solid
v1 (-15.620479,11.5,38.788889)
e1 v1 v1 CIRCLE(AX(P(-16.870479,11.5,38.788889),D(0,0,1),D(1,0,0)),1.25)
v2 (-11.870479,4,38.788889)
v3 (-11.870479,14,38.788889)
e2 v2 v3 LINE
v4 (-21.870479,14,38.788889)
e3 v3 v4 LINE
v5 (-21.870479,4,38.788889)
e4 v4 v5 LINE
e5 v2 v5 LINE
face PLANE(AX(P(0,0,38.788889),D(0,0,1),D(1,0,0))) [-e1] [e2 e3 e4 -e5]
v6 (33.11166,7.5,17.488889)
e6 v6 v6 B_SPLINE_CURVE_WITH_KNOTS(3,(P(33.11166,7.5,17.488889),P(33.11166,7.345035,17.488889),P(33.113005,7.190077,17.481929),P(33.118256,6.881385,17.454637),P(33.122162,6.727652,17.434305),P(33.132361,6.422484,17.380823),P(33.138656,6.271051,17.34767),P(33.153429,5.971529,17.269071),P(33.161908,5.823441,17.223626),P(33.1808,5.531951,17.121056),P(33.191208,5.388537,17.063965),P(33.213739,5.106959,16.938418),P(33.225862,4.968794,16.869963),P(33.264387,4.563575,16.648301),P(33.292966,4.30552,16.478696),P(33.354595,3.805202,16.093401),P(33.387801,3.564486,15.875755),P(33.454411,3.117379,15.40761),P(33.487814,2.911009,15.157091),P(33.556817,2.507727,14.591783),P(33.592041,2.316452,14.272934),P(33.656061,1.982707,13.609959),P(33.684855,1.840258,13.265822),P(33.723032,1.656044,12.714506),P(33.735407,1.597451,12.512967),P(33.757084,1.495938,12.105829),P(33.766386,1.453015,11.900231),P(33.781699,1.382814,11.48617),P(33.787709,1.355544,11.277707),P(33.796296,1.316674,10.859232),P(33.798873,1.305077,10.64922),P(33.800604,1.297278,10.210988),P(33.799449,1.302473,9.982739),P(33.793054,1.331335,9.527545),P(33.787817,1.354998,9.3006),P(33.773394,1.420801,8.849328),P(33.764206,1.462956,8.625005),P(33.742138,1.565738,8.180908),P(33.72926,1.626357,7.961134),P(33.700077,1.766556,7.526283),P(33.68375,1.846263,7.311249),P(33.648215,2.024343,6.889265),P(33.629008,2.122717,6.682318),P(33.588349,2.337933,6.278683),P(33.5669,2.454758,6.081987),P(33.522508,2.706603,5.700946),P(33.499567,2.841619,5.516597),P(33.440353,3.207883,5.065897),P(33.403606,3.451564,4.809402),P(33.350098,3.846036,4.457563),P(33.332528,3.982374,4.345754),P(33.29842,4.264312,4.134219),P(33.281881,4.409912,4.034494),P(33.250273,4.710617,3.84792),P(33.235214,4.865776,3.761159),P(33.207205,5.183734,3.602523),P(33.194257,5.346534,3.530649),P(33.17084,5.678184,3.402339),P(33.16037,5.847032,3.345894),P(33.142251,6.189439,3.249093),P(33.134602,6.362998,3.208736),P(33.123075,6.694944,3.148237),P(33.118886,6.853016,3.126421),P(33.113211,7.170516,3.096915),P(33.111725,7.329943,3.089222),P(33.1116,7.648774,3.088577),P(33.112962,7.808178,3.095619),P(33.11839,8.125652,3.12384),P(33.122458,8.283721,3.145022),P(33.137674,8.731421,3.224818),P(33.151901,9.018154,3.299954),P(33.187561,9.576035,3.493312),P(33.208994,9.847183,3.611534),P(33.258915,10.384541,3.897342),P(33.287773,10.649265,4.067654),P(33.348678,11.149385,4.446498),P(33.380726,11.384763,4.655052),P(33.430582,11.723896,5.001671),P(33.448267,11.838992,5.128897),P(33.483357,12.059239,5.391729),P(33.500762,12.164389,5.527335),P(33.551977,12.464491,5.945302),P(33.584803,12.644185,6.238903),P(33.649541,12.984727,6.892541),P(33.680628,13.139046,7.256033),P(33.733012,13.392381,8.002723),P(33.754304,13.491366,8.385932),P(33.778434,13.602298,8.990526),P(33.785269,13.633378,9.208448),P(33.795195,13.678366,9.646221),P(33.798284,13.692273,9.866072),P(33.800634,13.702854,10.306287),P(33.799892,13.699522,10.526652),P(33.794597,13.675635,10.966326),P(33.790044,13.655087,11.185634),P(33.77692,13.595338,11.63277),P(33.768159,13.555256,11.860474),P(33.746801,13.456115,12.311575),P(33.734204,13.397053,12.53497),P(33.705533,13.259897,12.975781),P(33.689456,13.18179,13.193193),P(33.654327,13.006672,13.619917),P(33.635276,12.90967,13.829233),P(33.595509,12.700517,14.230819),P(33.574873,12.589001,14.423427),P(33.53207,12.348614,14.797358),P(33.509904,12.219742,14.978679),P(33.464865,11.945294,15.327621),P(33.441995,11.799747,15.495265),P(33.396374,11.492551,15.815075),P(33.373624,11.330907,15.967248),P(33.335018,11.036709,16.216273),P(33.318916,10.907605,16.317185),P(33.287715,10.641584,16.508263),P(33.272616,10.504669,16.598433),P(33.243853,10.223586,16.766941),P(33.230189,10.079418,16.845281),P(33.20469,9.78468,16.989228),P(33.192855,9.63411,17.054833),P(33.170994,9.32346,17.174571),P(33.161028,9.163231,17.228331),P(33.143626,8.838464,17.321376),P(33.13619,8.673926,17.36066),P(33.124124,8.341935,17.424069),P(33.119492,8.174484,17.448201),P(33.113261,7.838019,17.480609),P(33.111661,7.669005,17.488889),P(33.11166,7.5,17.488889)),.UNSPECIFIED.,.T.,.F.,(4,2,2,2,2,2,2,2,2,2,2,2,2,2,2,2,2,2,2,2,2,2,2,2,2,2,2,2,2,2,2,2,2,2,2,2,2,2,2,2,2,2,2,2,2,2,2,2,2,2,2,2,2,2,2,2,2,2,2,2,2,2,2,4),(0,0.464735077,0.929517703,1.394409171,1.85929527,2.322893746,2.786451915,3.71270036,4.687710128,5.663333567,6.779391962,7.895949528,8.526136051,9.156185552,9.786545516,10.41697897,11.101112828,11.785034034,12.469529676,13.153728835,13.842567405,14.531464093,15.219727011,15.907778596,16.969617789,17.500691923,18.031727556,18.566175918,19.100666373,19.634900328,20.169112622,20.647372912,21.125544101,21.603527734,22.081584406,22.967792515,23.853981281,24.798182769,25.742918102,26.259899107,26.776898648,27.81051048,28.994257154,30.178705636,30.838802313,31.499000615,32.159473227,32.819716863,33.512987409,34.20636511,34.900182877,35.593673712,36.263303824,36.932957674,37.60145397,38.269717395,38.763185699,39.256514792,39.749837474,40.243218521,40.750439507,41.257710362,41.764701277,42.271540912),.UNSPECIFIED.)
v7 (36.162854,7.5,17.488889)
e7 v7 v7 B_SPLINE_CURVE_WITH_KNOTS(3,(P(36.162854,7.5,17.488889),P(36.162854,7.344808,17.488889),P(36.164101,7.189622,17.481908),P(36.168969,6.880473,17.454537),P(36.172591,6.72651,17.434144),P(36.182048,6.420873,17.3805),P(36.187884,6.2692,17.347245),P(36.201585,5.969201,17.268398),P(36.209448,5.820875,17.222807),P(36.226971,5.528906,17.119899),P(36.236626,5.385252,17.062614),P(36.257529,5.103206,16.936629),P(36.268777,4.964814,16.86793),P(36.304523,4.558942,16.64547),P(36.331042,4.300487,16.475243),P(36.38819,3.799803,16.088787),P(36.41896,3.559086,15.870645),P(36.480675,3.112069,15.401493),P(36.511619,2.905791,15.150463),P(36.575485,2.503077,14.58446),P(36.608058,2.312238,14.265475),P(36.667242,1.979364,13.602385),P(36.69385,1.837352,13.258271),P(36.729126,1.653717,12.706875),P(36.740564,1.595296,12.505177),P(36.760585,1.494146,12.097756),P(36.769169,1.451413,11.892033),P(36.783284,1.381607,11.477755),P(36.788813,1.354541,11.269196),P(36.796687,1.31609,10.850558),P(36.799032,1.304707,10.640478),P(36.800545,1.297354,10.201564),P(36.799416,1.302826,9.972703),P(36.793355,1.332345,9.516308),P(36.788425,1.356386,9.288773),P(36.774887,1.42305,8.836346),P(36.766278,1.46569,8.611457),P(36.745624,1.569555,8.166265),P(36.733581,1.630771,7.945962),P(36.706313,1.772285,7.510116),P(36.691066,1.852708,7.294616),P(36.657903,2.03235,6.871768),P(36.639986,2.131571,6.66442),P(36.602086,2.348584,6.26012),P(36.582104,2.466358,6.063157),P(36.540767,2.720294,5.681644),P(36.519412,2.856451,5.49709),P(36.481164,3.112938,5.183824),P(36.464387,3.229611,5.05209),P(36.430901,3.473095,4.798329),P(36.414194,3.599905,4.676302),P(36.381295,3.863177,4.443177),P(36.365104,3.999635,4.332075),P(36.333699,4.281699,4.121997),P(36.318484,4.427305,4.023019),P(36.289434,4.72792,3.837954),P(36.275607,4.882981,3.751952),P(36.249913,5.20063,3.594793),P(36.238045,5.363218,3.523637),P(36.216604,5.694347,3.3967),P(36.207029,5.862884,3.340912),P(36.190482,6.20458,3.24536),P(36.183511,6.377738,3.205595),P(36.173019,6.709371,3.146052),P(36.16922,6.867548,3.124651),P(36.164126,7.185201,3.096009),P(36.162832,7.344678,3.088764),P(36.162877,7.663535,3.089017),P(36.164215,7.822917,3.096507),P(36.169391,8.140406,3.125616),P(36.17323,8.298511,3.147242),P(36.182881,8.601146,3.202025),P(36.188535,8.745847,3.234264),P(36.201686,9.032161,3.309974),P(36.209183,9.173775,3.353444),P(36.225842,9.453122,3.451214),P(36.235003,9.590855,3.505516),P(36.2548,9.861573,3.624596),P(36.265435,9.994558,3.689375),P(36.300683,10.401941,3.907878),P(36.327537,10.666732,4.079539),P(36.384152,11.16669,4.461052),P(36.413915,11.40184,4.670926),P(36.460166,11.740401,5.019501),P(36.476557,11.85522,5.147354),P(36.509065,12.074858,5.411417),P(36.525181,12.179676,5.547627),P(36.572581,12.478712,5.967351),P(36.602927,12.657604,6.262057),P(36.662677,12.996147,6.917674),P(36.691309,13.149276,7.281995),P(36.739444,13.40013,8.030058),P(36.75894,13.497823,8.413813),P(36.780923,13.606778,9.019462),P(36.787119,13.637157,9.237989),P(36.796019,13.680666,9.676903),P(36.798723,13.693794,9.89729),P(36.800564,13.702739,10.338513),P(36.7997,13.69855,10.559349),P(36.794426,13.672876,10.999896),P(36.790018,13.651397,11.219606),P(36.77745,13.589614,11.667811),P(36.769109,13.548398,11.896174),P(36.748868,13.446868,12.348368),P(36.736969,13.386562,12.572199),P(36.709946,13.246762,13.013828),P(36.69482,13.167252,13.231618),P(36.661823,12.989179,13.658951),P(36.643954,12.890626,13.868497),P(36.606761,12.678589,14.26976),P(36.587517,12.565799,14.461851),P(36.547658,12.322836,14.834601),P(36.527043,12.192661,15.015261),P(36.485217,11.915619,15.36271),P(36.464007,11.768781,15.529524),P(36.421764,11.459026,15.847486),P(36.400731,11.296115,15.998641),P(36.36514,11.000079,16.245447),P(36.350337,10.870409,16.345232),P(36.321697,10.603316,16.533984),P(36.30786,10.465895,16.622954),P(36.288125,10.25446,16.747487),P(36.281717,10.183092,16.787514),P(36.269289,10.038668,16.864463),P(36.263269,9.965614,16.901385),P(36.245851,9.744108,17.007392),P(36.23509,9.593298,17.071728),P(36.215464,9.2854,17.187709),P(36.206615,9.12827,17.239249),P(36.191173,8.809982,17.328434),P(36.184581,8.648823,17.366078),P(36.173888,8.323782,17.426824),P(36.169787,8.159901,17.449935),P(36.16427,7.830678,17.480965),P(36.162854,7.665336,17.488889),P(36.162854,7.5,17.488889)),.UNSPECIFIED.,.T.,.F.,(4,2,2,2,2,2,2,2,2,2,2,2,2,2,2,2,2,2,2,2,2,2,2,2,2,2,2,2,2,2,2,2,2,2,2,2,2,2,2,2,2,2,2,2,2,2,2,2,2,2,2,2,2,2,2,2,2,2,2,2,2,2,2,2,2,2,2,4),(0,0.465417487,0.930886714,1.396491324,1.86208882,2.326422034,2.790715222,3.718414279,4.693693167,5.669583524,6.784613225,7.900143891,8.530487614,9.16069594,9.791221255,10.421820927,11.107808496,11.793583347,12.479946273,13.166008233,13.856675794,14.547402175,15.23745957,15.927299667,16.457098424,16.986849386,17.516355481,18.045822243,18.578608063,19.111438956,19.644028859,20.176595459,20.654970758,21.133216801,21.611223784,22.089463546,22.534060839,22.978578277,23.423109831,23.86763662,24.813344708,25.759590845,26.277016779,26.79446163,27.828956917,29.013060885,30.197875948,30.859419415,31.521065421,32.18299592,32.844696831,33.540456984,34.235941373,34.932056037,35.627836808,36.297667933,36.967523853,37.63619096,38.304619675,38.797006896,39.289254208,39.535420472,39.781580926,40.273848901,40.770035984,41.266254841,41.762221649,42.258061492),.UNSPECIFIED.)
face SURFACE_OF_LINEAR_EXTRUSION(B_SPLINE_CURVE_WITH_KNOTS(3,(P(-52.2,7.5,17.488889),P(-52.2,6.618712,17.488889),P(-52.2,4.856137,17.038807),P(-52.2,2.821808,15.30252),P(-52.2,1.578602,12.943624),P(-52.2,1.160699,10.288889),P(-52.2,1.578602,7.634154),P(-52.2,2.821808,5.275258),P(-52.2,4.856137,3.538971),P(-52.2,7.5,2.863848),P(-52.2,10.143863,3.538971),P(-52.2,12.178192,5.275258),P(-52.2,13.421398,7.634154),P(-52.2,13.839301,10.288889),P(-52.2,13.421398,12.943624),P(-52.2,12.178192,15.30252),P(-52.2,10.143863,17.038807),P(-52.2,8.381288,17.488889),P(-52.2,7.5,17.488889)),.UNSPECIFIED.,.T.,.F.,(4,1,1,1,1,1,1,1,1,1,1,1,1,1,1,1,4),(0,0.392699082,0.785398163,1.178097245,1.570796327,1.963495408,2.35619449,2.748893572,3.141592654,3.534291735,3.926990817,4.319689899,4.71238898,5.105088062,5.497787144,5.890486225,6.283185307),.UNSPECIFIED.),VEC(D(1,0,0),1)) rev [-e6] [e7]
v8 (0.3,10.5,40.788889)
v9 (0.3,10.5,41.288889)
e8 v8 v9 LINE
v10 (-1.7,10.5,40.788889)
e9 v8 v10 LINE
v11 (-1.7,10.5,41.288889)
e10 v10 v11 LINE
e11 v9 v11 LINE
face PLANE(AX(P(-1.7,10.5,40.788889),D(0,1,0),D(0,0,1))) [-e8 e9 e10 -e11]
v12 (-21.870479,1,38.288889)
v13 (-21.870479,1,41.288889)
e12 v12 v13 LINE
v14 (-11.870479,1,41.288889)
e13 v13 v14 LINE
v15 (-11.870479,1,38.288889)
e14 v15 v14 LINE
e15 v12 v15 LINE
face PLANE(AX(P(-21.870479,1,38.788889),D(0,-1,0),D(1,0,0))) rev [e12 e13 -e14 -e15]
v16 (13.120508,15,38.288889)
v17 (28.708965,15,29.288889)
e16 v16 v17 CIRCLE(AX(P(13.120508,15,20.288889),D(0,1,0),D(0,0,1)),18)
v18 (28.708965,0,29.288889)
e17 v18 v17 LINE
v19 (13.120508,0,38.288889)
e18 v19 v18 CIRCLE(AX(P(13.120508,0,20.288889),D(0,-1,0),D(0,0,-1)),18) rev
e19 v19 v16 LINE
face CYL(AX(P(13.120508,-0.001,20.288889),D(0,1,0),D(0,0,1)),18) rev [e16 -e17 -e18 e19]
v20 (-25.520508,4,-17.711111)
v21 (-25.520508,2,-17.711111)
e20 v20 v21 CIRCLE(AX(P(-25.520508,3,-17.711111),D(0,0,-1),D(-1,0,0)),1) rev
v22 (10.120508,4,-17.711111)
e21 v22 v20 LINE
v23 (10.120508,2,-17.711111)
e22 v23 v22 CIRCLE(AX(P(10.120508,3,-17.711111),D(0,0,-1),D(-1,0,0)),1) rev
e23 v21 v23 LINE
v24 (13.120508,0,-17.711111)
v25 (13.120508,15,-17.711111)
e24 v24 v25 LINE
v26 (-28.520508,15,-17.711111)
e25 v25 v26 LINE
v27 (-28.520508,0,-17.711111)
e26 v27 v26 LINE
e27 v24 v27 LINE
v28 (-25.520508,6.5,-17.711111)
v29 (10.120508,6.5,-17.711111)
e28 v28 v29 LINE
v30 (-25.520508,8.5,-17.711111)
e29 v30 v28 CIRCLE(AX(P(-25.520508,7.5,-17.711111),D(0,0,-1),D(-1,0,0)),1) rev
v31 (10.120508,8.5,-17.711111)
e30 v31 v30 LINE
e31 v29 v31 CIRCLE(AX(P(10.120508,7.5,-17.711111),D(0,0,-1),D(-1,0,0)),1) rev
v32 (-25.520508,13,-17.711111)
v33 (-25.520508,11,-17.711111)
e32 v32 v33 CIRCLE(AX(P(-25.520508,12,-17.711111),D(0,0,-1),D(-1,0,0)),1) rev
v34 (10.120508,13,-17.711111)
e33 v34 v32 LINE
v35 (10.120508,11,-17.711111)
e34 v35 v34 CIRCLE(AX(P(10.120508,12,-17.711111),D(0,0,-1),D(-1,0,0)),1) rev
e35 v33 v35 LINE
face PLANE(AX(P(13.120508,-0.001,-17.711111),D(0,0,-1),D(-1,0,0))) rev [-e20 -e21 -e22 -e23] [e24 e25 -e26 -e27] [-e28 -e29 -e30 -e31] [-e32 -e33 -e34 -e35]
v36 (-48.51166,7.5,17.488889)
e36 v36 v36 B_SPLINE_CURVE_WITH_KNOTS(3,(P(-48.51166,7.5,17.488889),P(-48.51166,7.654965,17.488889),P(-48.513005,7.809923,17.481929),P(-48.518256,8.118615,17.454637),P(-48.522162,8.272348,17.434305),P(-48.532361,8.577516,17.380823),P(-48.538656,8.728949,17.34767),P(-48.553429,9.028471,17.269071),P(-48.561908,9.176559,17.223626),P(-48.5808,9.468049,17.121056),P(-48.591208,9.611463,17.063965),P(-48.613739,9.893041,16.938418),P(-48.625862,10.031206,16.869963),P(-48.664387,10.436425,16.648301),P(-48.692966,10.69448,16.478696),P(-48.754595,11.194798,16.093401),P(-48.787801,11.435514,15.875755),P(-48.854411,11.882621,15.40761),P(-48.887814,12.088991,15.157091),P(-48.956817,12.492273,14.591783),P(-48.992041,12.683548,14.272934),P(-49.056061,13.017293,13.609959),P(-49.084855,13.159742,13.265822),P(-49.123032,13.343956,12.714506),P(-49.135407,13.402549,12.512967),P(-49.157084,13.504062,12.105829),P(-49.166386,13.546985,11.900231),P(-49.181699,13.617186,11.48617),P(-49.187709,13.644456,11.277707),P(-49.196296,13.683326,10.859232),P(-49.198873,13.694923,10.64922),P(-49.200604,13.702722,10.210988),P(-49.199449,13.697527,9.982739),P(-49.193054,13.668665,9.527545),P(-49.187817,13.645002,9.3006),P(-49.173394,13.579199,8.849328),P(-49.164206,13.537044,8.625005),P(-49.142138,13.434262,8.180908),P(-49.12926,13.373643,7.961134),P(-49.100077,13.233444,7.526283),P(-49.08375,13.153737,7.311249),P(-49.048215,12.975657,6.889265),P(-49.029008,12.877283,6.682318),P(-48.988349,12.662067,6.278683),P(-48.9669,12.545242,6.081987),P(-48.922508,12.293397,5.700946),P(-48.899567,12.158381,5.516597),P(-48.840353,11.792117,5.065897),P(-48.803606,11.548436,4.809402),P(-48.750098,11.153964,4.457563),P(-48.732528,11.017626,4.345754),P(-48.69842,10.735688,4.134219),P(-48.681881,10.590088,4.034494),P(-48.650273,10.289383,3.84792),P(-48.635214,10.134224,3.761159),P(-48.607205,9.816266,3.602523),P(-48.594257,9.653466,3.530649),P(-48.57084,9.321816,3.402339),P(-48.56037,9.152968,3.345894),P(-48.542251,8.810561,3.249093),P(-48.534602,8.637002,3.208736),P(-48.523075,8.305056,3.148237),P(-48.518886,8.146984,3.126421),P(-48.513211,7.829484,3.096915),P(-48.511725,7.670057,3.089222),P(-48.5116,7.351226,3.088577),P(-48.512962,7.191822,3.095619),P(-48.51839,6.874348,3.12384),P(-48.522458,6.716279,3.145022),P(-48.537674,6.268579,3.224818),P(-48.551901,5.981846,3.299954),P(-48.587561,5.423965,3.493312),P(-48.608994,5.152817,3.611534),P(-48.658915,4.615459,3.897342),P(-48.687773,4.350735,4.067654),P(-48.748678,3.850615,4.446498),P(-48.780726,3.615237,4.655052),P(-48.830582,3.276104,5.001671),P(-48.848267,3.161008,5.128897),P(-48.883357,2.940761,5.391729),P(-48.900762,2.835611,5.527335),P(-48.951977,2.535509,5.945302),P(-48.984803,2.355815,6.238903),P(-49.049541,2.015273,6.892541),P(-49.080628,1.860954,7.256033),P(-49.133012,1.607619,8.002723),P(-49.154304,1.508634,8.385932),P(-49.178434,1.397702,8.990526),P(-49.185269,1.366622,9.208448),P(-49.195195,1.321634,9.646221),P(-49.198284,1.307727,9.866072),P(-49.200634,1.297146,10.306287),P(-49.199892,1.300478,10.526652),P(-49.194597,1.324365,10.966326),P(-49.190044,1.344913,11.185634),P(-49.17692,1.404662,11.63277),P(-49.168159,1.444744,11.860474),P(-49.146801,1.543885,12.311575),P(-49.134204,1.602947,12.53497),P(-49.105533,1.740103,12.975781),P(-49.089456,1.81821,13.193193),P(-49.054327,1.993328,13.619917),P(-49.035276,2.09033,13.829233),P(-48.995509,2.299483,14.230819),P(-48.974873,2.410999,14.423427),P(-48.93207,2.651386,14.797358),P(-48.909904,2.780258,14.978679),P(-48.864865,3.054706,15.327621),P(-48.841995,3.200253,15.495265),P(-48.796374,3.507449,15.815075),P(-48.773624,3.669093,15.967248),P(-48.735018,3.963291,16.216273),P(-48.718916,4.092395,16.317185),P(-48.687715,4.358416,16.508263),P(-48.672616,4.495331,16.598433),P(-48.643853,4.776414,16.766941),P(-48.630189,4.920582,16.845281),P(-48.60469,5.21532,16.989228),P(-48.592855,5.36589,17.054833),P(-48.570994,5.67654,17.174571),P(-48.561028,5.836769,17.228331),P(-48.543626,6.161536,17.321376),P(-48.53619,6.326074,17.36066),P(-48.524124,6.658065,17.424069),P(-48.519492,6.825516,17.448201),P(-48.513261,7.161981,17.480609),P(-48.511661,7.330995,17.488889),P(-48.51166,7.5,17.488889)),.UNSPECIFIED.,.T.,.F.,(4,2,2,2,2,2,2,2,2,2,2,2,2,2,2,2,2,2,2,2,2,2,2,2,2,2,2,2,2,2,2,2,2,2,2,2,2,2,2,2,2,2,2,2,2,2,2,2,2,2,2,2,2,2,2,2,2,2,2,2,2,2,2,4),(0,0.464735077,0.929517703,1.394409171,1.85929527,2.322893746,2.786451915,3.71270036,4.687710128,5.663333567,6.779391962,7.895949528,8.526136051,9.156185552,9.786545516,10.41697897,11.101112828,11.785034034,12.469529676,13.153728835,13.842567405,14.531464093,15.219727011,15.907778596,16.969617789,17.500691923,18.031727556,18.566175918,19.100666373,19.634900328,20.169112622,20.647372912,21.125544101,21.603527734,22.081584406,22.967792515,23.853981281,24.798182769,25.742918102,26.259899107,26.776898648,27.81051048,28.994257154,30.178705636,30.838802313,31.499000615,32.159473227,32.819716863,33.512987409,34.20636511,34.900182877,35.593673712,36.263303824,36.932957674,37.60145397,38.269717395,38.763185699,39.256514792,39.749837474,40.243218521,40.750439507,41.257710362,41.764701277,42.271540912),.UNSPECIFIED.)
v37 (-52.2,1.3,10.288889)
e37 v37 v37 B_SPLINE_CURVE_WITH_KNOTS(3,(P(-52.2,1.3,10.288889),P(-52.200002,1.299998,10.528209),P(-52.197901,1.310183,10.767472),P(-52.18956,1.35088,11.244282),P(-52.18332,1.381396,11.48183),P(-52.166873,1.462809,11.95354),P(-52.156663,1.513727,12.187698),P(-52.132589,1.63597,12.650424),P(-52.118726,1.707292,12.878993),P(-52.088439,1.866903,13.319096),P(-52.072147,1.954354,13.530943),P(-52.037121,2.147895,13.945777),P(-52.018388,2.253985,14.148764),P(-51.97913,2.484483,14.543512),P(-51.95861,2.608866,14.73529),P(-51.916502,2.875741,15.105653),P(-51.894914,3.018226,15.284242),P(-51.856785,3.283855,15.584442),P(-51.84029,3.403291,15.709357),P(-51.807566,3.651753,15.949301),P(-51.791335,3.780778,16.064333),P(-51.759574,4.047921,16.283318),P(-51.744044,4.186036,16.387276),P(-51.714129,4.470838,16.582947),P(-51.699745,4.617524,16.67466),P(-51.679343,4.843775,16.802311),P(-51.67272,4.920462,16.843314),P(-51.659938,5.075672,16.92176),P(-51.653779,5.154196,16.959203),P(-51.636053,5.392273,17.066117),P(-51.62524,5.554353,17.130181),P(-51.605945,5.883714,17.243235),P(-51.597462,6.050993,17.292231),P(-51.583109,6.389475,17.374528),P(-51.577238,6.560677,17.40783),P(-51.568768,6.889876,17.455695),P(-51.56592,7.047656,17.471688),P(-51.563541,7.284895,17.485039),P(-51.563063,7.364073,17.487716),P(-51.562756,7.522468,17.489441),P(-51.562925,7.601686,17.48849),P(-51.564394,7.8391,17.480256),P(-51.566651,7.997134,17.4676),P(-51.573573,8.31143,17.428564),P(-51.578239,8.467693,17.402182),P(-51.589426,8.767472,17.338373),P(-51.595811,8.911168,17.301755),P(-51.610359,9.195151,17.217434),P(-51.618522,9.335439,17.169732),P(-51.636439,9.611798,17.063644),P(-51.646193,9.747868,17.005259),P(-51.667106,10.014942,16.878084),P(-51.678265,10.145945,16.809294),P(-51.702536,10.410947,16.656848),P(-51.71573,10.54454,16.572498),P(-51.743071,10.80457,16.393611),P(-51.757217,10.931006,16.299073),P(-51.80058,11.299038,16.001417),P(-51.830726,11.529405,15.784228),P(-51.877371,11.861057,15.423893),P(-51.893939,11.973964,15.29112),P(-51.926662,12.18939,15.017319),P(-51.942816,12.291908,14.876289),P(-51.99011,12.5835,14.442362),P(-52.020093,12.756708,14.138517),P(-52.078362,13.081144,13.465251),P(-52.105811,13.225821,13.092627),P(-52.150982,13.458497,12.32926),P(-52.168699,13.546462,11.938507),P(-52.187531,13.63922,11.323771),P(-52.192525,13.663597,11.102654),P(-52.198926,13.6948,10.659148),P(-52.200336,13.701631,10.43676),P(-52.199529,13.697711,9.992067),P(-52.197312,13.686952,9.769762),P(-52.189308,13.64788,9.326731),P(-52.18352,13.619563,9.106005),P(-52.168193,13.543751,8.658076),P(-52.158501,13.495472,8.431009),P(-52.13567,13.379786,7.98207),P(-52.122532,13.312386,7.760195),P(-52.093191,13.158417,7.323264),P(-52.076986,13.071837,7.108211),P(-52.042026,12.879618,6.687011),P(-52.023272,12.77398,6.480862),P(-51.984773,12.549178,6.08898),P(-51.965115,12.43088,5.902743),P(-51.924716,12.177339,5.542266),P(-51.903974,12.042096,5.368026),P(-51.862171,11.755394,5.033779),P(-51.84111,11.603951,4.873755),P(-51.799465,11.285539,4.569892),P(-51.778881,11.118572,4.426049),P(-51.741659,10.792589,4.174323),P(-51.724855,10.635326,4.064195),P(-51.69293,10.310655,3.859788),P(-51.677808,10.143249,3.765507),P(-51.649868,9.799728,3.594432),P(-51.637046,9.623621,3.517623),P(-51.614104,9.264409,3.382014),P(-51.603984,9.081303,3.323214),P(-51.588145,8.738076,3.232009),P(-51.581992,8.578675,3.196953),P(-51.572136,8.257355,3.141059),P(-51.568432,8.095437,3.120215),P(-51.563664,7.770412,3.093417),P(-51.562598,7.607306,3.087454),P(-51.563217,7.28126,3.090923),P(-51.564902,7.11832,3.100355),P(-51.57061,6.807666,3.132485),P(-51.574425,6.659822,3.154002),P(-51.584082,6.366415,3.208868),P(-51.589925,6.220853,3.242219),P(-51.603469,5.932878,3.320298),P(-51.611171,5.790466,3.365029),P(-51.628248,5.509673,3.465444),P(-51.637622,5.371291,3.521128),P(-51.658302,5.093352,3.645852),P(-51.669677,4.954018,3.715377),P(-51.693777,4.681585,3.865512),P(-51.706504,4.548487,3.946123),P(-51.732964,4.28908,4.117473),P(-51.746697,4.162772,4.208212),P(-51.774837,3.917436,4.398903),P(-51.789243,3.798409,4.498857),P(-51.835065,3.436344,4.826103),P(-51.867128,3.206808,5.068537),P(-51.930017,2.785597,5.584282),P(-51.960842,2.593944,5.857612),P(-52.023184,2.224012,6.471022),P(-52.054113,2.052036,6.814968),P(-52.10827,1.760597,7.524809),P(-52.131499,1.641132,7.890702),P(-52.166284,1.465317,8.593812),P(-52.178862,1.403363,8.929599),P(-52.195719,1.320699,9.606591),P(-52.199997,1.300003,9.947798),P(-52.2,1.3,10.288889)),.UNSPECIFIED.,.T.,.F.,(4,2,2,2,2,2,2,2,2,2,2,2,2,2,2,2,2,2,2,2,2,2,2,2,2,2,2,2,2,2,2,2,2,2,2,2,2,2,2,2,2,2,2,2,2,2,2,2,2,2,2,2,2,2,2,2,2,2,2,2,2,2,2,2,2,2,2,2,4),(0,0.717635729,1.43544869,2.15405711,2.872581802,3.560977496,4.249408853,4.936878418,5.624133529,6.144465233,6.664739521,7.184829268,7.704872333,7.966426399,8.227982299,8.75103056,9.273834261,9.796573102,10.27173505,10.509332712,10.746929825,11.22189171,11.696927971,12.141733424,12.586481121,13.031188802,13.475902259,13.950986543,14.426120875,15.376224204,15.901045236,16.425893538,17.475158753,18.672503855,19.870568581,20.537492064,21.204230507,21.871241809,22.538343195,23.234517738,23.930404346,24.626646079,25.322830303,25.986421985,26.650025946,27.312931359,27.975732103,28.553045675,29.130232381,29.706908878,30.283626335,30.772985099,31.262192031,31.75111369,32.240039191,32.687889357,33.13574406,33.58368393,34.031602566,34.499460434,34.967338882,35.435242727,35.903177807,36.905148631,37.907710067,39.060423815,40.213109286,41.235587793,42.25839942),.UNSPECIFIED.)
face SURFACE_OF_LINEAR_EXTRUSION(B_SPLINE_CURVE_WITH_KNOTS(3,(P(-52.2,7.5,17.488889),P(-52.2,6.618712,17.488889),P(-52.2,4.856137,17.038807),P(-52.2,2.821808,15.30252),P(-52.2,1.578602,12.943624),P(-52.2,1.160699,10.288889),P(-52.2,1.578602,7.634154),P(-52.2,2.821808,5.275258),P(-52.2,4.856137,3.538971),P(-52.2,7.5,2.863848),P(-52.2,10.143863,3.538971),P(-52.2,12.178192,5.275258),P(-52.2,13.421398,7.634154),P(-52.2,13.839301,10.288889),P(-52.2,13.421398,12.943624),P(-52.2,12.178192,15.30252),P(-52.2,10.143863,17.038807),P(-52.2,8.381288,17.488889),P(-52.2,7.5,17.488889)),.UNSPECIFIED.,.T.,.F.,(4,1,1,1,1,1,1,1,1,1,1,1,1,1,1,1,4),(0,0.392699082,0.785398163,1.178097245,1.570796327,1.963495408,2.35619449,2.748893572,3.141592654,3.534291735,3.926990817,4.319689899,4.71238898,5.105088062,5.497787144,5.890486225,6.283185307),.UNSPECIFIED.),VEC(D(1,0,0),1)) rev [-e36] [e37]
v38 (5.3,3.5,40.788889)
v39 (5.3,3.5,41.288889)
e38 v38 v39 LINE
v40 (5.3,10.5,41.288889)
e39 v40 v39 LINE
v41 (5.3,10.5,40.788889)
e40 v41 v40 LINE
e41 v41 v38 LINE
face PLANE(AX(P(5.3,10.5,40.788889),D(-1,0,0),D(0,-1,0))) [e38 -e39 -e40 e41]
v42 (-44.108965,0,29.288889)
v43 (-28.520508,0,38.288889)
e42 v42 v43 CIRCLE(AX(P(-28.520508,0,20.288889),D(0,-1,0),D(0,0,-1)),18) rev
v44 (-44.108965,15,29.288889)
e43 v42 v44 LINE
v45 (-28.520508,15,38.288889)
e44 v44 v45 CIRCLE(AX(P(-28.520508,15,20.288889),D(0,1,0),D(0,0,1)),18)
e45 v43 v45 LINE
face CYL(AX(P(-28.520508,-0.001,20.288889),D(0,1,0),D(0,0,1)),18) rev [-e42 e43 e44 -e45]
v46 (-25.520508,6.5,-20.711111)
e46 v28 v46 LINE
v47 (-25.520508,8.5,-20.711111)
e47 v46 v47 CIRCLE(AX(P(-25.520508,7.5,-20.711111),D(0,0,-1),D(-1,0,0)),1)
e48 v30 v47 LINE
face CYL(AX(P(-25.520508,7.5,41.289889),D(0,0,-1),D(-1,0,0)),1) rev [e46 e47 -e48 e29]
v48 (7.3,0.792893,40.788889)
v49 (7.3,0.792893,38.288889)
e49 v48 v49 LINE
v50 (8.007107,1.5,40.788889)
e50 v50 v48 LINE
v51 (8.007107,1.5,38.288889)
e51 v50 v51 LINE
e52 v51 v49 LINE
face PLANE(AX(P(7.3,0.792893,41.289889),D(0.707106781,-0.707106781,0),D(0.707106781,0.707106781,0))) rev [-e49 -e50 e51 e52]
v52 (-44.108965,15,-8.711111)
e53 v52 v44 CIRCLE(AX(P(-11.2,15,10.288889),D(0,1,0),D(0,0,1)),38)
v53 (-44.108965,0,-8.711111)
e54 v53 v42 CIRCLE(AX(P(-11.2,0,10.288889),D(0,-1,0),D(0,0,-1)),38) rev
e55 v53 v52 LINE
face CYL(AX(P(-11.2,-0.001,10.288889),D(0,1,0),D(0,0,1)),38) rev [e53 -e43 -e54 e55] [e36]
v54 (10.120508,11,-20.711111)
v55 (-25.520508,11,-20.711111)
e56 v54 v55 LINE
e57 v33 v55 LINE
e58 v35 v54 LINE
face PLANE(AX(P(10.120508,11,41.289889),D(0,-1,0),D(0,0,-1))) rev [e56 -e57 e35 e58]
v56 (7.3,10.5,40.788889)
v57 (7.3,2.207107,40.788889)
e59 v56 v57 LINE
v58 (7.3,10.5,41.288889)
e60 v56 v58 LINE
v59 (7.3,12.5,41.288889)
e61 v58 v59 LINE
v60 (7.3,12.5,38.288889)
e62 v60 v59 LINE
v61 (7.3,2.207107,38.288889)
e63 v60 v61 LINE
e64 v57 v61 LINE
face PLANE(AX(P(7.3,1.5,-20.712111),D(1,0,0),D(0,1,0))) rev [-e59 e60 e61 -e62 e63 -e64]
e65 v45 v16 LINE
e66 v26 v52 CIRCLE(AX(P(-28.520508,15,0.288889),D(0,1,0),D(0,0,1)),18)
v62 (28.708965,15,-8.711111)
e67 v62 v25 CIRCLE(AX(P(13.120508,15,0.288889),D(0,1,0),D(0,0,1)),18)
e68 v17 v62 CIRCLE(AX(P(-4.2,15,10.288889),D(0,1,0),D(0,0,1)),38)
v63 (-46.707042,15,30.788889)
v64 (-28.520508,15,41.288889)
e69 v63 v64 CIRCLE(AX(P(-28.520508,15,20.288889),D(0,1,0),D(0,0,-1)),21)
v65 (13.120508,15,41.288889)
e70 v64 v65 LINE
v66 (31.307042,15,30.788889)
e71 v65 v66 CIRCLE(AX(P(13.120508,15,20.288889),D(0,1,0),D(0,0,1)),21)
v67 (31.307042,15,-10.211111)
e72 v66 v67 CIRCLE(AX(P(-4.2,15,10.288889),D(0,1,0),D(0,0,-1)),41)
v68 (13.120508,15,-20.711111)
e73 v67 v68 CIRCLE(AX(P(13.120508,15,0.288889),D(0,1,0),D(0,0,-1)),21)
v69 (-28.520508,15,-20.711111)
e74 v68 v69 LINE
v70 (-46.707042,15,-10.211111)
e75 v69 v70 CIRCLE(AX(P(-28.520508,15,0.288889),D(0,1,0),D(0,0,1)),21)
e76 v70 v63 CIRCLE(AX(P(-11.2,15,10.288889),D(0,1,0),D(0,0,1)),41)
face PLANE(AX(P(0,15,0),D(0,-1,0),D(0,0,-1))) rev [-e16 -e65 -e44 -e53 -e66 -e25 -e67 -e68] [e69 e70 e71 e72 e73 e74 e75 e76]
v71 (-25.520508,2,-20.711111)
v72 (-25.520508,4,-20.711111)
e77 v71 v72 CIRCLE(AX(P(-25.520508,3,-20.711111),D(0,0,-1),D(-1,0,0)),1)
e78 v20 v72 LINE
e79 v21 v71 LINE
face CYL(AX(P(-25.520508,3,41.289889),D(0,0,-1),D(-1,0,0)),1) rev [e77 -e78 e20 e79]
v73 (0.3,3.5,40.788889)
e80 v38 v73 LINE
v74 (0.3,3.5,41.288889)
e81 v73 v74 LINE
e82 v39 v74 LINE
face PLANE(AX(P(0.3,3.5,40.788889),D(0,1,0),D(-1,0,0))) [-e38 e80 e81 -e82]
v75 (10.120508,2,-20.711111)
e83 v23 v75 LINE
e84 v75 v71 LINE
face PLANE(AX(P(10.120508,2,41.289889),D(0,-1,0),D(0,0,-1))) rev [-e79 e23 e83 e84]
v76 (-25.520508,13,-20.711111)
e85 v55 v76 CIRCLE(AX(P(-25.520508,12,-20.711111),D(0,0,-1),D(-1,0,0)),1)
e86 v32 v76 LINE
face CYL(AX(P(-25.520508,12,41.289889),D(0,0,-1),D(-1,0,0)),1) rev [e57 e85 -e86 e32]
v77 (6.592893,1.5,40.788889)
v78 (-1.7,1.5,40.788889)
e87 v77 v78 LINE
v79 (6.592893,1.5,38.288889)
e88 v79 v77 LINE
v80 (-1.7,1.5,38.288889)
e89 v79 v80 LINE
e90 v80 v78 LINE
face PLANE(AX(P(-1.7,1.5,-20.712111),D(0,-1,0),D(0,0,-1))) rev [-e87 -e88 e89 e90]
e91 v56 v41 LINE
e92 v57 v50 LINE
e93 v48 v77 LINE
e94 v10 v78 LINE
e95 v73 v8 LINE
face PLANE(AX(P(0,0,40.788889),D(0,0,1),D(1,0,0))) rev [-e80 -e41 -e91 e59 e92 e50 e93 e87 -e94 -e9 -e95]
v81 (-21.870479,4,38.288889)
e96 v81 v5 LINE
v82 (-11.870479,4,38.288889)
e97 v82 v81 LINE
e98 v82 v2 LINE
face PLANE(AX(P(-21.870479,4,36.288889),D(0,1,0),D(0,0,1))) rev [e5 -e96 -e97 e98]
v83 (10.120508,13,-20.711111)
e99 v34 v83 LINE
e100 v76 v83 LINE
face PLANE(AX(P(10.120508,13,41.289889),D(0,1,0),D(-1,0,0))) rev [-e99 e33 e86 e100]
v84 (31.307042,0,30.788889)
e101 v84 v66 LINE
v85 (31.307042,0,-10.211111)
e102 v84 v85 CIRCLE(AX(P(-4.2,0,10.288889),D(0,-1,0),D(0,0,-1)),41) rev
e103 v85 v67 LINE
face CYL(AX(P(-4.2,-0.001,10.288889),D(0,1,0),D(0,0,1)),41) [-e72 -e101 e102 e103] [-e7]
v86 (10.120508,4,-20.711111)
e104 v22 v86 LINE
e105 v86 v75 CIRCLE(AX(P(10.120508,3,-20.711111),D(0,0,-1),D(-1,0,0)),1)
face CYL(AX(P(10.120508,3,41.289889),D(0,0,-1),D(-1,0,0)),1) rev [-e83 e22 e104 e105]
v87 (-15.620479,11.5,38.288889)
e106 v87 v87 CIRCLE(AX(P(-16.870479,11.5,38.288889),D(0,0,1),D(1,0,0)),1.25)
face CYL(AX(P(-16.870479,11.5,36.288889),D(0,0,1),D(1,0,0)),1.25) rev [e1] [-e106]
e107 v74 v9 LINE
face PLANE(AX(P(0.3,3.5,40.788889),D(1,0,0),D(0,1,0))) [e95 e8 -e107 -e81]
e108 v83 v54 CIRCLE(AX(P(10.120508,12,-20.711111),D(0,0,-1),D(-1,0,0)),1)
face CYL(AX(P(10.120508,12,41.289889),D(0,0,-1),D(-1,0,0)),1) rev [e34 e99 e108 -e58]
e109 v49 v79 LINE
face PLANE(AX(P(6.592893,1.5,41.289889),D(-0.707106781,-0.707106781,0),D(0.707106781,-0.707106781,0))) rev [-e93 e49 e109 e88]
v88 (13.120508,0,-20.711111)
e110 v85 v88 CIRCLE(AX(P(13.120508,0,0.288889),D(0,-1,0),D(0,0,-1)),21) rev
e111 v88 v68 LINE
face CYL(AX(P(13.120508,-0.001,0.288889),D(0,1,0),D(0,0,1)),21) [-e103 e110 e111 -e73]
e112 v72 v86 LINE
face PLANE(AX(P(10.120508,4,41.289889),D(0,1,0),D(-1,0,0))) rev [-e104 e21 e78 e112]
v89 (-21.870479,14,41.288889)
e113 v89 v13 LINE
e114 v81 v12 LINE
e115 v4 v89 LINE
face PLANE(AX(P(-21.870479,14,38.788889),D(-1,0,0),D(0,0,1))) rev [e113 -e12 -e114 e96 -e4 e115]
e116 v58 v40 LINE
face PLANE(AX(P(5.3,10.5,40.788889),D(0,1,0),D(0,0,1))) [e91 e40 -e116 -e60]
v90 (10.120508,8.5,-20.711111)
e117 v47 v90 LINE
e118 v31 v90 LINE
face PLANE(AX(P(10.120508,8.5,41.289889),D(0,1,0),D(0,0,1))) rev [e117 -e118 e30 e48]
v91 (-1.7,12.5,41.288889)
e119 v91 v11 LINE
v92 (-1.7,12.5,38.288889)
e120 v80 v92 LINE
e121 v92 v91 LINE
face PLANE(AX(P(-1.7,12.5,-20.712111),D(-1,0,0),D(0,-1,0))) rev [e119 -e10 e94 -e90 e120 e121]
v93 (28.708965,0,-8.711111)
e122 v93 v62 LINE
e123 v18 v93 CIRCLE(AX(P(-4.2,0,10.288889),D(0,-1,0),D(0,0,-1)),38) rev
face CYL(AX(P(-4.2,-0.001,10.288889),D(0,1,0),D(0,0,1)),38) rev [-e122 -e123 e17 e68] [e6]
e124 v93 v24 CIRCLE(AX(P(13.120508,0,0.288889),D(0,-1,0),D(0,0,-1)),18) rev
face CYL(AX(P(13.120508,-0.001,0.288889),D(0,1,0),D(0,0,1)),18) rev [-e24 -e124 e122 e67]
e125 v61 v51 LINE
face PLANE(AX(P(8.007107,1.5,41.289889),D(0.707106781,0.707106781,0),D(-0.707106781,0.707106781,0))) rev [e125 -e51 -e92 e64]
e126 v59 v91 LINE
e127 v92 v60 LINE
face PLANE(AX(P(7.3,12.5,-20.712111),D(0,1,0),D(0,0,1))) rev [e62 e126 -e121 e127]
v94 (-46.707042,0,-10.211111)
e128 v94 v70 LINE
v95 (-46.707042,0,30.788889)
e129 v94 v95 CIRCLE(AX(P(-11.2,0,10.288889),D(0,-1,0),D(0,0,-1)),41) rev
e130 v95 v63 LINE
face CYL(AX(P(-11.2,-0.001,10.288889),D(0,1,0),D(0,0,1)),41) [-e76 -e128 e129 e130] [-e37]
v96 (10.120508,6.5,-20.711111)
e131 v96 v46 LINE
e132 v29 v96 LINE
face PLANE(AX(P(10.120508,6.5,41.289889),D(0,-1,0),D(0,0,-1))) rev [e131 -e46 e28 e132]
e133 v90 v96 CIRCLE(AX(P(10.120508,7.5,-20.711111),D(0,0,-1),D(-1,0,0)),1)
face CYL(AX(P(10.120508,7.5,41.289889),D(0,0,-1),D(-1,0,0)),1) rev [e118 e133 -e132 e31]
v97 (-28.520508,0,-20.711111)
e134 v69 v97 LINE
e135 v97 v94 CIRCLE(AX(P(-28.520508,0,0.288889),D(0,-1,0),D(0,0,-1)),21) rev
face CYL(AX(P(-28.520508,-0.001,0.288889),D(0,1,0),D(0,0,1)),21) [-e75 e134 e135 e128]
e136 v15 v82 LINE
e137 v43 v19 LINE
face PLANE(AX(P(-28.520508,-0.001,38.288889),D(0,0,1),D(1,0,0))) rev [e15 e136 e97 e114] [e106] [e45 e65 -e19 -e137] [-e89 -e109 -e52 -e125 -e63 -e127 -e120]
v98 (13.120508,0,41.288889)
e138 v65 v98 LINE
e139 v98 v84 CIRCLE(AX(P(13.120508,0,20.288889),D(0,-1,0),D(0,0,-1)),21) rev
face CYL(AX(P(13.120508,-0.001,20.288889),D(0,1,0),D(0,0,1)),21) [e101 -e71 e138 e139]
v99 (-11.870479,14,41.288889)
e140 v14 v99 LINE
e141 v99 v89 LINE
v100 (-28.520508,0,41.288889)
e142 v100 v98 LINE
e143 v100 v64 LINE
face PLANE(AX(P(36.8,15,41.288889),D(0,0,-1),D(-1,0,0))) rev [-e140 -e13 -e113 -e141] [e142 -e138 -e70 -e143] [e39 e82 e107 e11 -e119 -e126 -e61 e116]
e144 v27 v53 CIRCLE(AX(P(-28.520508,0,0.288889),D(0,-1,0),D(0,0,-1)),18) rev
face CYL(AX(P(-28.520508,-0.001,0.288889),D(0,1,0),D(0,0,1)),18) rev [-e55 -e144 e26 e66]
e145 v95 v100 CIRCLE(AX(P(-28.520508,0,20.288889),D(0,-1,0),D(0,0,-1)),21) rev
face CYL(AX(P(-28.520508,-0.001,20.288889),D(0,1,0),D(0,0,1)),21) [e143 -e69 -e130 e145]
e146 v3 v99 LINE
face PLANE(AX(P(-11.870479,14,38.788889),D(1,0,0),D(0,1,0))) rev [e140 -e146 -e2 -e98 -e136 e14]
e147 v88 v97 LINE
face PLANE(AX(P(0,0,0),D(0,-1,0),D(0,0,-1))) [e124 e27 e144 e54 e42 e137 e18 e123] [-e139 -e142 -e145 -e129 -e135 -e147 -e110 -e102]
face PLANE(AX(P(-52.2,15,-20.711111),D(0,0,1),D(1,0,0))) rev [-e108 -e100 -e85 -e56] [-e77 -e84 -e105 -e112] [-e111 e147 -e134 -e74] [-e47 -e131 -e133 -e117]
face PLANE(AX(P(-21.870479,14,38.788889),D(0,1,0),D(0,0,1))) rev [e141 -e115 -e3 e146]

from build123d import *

# Parameters (mm, degrees)
SKETCH_1_W           = 89
SKETCH_1_H           = 62
EXTRUDE_1_DEPTH      = 15
CUT_EXTRUDE_START    = -15.000001
SKETCH_2_W           = 114.345269922
SKETCH_2_H           = 82.741202996
CUT_EXTRUDE_2_DEPTH  = 15.000002
CUT_EXTRUDE_3_REACH  = 70.225
CUT_EXTRUDE_6_REACH  = 84.425
SKETCH_4_W           = 9
SKETCH_4_H           = 11
FILLET_1_R           = 0.5
CUT_EXTRUDE_7_REACH  = 82.193
EXTRUDE_2_DEPTH      = 0.5
SKETCH_11_W          = 10
SKETCH_11_H          = 13
CUT_EXTRUDE_10_DEPTH = 2.5
SKETCH_12_R          = 1.25
SKETCH_12_W          = 10
SKETCH_12_H          = 3
CUT_EXTRUDE_11_DEPTH = 2.5
CUT_EXTRUDE_12_REACH = 84.425
CUT_EXTRUDE_START_2  = -52.200000102
CUT_EXTRUDE_13_DEPTH = 88.999999964


with BuildPart() as part:
    # 草图1 → 凸台-拉伸1 (new body)
    with BuildSketch(Plane(origin=(0, 0, 0), x_dir=(1, 0, 0), z_dir=(0, 1, 0))):
        with Locations((-7.7, -10.288888889)):
            Rectangle(SKETCH_1_W, SKETCH_1_H)
    extrude(amount=EXTRUDE_1_DEPTH)

    # 草图2 → 切除-拉伸2 (cut)
    with BuildSketch(Plane(origin=(0, 15, 0), x_dir=(1, 0, 0), z_dir=(0, 1, 0)).offset(CUT_EXTRUDE_START)):
        with Locations((-11.341983823, -7.488413354)):
            Rectangle(SKETCH_2_W, SKETCH_2_H)
        with BuildLine():
            Line((-28.520508076, 20.711111111), (13.120508076, 20.711111111))
            ThreePointArc((13.120508076, 20.711111111), (23.620508076, 17.897644591), (31.307041555, 10.211111111))
            ThreePointArc((31.307041555, 10.211111111), (36.8, -10.288888889), (31.307041555, -30.788888889))
            ThreePointArc((31.307041555, -30.788888889), (23.620508076, -38.475422368), (13.120508076, -41.288888889))
            Line((13.120508076, -41.288888889), (-28.520508076, -41.288888889))
            ThreePointArc((-28.520508076, -41.288888889), (-39.020508076, -38.475422368), (-46.707041555, -30.788888889))
            ThreePointArc((-46.707041555, -30.788888889), (-52.2, -10.288888889), (-46.707041555, 10.211111111))
            ThreePointArc((-46.707041555, 10.211111111), (-39.020508076, 17.897644591), (-28.520508076, 20.711111111))
        make_face(mode=Mode.SUBTRACT)
    extrude(amount=CUT_EXTRUDE_2_DEPTH, mode=Mode.SUBTRACT)

    # 草图3 → 切除-拉伸3 (cut, up to next)
    with BuildSketch(Plane(origin=(0, 15, 0), x_dir=(1, 0, 0), z_dir=(0, 1, 0)), mode=Mode.PRIVATE) as cut_extrude_3_sk1:
        with BuildLine():
            Line((-28.520508076, -38.288888889), (13.120508076, -38.288888889))
            ThreePointArc((13.120508076, -38.288888889), (22.120508076, -35.877346157), (28.708965344, -29.288888889))
            ThreePointArc((28.708965344, -29.288888889), (33.8, -10.288888889), (28.708965344, 8.711111111))
            ThreePointArc((28.708965344, 8.711111111), (22.120508076, 15.299568379), (13.120508076, 17.711111111))
            Line((13.120508076, 17.711111111), (-28.520508076, 17.711111111))
            ThreePointArc((-28.520508076, 17.711111111), (-37.520508076, 15.299568379), (-44.108965344, 8.711111111))
            ThreePointArc((-44.108965344, 8.711111111), (-49.2, -10.288888889), (-44.108965344, -29.288888889))
            ThreePointArc((-44.108965344, -29.288888889), (-37.520508076, -35.877346157), (-28.520508076, -38.288888889))
        make_face()
    cut_extrude_3_tool1 = extrude(cut_extrude_3_sk1.sketch, amount=-CUT_EXTRUDE_3_REACH, mode=Mode.PRIVATE) & part.part
    add(cut_extrude_3_tool1.solids().sort_by_distance((-7.7, 15, 10.288889))[0], mode=Mode.SUBTRACT)

    # 草图4 → 切除-拉伸6 (cut, up to next)
    with BuildSketch(Plane.XY.offset(41.288888889), mode=Mode.PRIVATE) as cut_extrude_6_sk1:
        with Locations((2.8, 7)):
            Rectangle(SKETCH_4_W, SKETCH_4_H)
    cut_extrude_6_tool1 = extrude(cut_extrude_6_sk1.sketch, amount=-CUT_EXTRUDE_6_REACH, mode=Mode.PRIVATE) & part.part
    add(cut_extrude_6_tool1.solids().sort_by_distance((2.8, 7, 41.288889))[0], mode=Mode.SUBTRACT)

    # 圆角1
    fillet_1_edges = [part.edges().sort_by_distance(p)[0] for p in [
        (7.3, 1.5, 39.788888889),
    ]]
    fillet(fillet_1_edges, radius=FILLET_1_R)

    # 草图7 → 切除-拉伸7 (cut, up to next)
    with BuildSketch(Plane(origin=(0, 0, 38.288888889), x_dir=(-1, 0, 0), z_dir=(0, 0, -1)), mode=Mode.PRIVATE) as cut_extrude_7_sk1:
        Polygon((-7.3, 2.207106781), (-6.592893219, 1.5), (-7.3, 0.792893219), (-8.007106781, 1.5), align=None)
    cut_extrude_7_tool1 = extrude(cut_extrude_7_sk1.sketch, amount=-CUT_EXTRUDE_7_REACH, mode=Mode.PRIVATE) & part.part
    add(cut_extrude_7_tool1.solids().sort_by_distance((7.3, 1.5, 38.288889))[0], mode=Mode.SUBTRACT)

    # 草图8 → 凸台-拉伸2 (add)
    with BuildSketch(Plane.XY.offset(41.288888889)):
        Polygon((-1.7, 1.5), (-1.7, 0), (10.425334972, 0), (10.425334972, 10.5), (7.3, 10.5), (5.3, 10.5), (5.3, 3.5), (0.3, 3.5), (0.3, 10.5), (-1.7, 10.5), align=None)
    extrude(amount=-EXTRUDE_2_DEPTH)

    # 草图11 → 切除-拉伸10 (cut)
    with BuildSketch(Plane.XY.offset(41.288888889)):
        with Locations((-16.870478922, 7.5)):
            Rectangle(SKETCH_11_W, SKETCH_11_H)
    extrude(amount=-CUT_EXTRUDE_10_DEPTH, mode=Mode.SUBTRACT)

    # 草图12 → 切除-拉伸11 (cut)
    with BuildSketch(Plane.XY.offset(38.788888889)):
        with Locations((-16.870478922, 11.5)):
            Circle(SKETCH_12_R)
        with Locations((-16.870478922, 2.5)):
            Rectangle(SKETCH_12_W, SKETCH_12_H)
    extrude(amount=-CUT_EXTRUDE_11_DEPTH, mode=Mode.SUBTRACT)

    # 草图13 → 切除-拉伸12 (cut, up to next)
    with BuildSketch(Plane(origin=(0, 0, -20.711111111), x_dir=(-1, 0, 0), z_dir=(0, 0, -1)), mode=Mode.PRIVATE) as cut_extrude_12_sk1:
        with BuildLine():
            Line((-10.120508076, 13), (25.520508076, 13))
            ThreePointArc((25.520508076, 13), (26.520508076, 12), (25.520508076, 11))
            Line((25.520508076, 11), (-10.120508076, 11))
            ThreePointArc((-10.120508076, 11), (-11.120508076, 12), (-10.120508076, 13))
        make_face()
    cut_extrude_12_tool1 = extrude(cut_extrude_12_sk1.sketch, amount=-CUT_EXTRUDE_12_REACH, mode=Mode.PRIVATE) & part.part
    # 草图13 → 切除-拉伸12 (cut, up to next)
    with BuildSketch(Plane(origin=(0, 0, -20.711111111), x_dir=(-1, 0, 0), z_dir=(0, 0, -1)), mode=Mode.PRIVATE) as cut_extrude_12_sk2:
        with BuildLine():
            Line((-10.120508076, 6.5), (25.520508076, 6.5))
            ThreePointArc((25.520508076, 6.5), (26.520508076, 7.5), (25.520508076, 8.5))
            Line((25.520508076, 8.5), (-10.120508076, 8.5))
            ThreePointArc((-10.120508076, 8.5), (-11.120508076, 7.5), (-10.120508076, 6.5))
        make_face()
    cut_extrude_12_tool2 = extrude(cut_extrude_12_sk2.sketch, amount=-CUT_EXTRUDE_12_REACH, mode=Mode.PRIVATE) & part.part
    # 草图13 → 切除-拉伸12 (cut, up to next)
    with BuildSketch(Plane(origin=(0, 0, -20.711111111), x_dir=(-1, 0, 0), z_dir=(0, 0, -1)), mode=Mode.PRIVATE) as cut_extrude_12_sk3:
        with BuildLine():
            Line((-10.120508076, 2), (25.520508076, 2))
            ThreePointArc((25.520508076, 2), (26.520508076, 3), (25.520508076, 4))
            Line((25.520508076, 4), (-10.120508076, 4))
            ThreePointArc((-10.120508076, 4), (-11.120508076, 3), (-10.120508076, 2))
        make_face()
    cut_extrude_12_tool3 = extrude(cut_extrude_12_sk3.sketch, amount=-CUT_EXTRUDE_12_REACH, mode=Mode.PRIVATE) & part.part
    add(cut_extrude_12_tool1.solids().sort_by_distance((-7.7, 12, -20.711111))[0], mode=Mode.SUBTRACT)
    add(cut_extrude_12_tool2.solids().sort_by_distance((-7.7, 7.5, -20.711111))[0], mode=Mode.SUBTRACT)
    add(cut_extrude_12_tool3.solids().sort_by_distance((-7.7, 3, -20.711111))[0], mode=Mode.SUBTRACT)

    # 切除-拉伸13: read off the stored shape, not the designer's step
    # 切除-拉伸13 outline → 切除-拉伸13 (cut)
    with BuildSketch(Plane(origin=(0, 0, 0), x_dir=(0, 0, -1), z_dir=(1, 0, 0)).offset(CUT_EXTRUDE_START_2)):
        with BuildLine():
            add(Edge.make_bspline(
                [(-17.488888889, 7.5), (-17.488888889, 6.618712307), (-17.038806778, 4.85613692), (-15.30252013, 2.82180753), (-12.943624098, 1.578601929), (-10.288888889, 1.160699036), (-7.634153679, 1.578601929), (-5.275257648, 2.82180753), (-3.538970999, 4.85613692), (-2.863847834, 7.5), (-3.538970999, 10.14386308), (-5.275257648, 12.17819247), (-7.634153679, 13.421398071), (-10.288888889, 13.839300964), (-12.943624098, 13.421398071), (-15.30252013, 12.17819247), (-17.038806778, 10.14386308), (-17.488888889, 8.381287693), (-17.488888889, 7.5)],
                knots=[0, 0, 0, 0, 0.392699082, 0.785398163, 1.178097245, 1.570796327, 1.963495408, 2.35619449, 2.748893572, 3.141592654, 3.534291735, 3.926990817, 4.319689899, 4.71238898, 5.105088062, 5.497787144, 5.890486225, 6.283185307, 6.283185307, 6.283185307, 6.283185307], degree=3))
        make_face()
    extrude(amount=CUT_EXTRUDE_13_DEPTH, mode=Mode.SUBTRACT)


solid = part.part
